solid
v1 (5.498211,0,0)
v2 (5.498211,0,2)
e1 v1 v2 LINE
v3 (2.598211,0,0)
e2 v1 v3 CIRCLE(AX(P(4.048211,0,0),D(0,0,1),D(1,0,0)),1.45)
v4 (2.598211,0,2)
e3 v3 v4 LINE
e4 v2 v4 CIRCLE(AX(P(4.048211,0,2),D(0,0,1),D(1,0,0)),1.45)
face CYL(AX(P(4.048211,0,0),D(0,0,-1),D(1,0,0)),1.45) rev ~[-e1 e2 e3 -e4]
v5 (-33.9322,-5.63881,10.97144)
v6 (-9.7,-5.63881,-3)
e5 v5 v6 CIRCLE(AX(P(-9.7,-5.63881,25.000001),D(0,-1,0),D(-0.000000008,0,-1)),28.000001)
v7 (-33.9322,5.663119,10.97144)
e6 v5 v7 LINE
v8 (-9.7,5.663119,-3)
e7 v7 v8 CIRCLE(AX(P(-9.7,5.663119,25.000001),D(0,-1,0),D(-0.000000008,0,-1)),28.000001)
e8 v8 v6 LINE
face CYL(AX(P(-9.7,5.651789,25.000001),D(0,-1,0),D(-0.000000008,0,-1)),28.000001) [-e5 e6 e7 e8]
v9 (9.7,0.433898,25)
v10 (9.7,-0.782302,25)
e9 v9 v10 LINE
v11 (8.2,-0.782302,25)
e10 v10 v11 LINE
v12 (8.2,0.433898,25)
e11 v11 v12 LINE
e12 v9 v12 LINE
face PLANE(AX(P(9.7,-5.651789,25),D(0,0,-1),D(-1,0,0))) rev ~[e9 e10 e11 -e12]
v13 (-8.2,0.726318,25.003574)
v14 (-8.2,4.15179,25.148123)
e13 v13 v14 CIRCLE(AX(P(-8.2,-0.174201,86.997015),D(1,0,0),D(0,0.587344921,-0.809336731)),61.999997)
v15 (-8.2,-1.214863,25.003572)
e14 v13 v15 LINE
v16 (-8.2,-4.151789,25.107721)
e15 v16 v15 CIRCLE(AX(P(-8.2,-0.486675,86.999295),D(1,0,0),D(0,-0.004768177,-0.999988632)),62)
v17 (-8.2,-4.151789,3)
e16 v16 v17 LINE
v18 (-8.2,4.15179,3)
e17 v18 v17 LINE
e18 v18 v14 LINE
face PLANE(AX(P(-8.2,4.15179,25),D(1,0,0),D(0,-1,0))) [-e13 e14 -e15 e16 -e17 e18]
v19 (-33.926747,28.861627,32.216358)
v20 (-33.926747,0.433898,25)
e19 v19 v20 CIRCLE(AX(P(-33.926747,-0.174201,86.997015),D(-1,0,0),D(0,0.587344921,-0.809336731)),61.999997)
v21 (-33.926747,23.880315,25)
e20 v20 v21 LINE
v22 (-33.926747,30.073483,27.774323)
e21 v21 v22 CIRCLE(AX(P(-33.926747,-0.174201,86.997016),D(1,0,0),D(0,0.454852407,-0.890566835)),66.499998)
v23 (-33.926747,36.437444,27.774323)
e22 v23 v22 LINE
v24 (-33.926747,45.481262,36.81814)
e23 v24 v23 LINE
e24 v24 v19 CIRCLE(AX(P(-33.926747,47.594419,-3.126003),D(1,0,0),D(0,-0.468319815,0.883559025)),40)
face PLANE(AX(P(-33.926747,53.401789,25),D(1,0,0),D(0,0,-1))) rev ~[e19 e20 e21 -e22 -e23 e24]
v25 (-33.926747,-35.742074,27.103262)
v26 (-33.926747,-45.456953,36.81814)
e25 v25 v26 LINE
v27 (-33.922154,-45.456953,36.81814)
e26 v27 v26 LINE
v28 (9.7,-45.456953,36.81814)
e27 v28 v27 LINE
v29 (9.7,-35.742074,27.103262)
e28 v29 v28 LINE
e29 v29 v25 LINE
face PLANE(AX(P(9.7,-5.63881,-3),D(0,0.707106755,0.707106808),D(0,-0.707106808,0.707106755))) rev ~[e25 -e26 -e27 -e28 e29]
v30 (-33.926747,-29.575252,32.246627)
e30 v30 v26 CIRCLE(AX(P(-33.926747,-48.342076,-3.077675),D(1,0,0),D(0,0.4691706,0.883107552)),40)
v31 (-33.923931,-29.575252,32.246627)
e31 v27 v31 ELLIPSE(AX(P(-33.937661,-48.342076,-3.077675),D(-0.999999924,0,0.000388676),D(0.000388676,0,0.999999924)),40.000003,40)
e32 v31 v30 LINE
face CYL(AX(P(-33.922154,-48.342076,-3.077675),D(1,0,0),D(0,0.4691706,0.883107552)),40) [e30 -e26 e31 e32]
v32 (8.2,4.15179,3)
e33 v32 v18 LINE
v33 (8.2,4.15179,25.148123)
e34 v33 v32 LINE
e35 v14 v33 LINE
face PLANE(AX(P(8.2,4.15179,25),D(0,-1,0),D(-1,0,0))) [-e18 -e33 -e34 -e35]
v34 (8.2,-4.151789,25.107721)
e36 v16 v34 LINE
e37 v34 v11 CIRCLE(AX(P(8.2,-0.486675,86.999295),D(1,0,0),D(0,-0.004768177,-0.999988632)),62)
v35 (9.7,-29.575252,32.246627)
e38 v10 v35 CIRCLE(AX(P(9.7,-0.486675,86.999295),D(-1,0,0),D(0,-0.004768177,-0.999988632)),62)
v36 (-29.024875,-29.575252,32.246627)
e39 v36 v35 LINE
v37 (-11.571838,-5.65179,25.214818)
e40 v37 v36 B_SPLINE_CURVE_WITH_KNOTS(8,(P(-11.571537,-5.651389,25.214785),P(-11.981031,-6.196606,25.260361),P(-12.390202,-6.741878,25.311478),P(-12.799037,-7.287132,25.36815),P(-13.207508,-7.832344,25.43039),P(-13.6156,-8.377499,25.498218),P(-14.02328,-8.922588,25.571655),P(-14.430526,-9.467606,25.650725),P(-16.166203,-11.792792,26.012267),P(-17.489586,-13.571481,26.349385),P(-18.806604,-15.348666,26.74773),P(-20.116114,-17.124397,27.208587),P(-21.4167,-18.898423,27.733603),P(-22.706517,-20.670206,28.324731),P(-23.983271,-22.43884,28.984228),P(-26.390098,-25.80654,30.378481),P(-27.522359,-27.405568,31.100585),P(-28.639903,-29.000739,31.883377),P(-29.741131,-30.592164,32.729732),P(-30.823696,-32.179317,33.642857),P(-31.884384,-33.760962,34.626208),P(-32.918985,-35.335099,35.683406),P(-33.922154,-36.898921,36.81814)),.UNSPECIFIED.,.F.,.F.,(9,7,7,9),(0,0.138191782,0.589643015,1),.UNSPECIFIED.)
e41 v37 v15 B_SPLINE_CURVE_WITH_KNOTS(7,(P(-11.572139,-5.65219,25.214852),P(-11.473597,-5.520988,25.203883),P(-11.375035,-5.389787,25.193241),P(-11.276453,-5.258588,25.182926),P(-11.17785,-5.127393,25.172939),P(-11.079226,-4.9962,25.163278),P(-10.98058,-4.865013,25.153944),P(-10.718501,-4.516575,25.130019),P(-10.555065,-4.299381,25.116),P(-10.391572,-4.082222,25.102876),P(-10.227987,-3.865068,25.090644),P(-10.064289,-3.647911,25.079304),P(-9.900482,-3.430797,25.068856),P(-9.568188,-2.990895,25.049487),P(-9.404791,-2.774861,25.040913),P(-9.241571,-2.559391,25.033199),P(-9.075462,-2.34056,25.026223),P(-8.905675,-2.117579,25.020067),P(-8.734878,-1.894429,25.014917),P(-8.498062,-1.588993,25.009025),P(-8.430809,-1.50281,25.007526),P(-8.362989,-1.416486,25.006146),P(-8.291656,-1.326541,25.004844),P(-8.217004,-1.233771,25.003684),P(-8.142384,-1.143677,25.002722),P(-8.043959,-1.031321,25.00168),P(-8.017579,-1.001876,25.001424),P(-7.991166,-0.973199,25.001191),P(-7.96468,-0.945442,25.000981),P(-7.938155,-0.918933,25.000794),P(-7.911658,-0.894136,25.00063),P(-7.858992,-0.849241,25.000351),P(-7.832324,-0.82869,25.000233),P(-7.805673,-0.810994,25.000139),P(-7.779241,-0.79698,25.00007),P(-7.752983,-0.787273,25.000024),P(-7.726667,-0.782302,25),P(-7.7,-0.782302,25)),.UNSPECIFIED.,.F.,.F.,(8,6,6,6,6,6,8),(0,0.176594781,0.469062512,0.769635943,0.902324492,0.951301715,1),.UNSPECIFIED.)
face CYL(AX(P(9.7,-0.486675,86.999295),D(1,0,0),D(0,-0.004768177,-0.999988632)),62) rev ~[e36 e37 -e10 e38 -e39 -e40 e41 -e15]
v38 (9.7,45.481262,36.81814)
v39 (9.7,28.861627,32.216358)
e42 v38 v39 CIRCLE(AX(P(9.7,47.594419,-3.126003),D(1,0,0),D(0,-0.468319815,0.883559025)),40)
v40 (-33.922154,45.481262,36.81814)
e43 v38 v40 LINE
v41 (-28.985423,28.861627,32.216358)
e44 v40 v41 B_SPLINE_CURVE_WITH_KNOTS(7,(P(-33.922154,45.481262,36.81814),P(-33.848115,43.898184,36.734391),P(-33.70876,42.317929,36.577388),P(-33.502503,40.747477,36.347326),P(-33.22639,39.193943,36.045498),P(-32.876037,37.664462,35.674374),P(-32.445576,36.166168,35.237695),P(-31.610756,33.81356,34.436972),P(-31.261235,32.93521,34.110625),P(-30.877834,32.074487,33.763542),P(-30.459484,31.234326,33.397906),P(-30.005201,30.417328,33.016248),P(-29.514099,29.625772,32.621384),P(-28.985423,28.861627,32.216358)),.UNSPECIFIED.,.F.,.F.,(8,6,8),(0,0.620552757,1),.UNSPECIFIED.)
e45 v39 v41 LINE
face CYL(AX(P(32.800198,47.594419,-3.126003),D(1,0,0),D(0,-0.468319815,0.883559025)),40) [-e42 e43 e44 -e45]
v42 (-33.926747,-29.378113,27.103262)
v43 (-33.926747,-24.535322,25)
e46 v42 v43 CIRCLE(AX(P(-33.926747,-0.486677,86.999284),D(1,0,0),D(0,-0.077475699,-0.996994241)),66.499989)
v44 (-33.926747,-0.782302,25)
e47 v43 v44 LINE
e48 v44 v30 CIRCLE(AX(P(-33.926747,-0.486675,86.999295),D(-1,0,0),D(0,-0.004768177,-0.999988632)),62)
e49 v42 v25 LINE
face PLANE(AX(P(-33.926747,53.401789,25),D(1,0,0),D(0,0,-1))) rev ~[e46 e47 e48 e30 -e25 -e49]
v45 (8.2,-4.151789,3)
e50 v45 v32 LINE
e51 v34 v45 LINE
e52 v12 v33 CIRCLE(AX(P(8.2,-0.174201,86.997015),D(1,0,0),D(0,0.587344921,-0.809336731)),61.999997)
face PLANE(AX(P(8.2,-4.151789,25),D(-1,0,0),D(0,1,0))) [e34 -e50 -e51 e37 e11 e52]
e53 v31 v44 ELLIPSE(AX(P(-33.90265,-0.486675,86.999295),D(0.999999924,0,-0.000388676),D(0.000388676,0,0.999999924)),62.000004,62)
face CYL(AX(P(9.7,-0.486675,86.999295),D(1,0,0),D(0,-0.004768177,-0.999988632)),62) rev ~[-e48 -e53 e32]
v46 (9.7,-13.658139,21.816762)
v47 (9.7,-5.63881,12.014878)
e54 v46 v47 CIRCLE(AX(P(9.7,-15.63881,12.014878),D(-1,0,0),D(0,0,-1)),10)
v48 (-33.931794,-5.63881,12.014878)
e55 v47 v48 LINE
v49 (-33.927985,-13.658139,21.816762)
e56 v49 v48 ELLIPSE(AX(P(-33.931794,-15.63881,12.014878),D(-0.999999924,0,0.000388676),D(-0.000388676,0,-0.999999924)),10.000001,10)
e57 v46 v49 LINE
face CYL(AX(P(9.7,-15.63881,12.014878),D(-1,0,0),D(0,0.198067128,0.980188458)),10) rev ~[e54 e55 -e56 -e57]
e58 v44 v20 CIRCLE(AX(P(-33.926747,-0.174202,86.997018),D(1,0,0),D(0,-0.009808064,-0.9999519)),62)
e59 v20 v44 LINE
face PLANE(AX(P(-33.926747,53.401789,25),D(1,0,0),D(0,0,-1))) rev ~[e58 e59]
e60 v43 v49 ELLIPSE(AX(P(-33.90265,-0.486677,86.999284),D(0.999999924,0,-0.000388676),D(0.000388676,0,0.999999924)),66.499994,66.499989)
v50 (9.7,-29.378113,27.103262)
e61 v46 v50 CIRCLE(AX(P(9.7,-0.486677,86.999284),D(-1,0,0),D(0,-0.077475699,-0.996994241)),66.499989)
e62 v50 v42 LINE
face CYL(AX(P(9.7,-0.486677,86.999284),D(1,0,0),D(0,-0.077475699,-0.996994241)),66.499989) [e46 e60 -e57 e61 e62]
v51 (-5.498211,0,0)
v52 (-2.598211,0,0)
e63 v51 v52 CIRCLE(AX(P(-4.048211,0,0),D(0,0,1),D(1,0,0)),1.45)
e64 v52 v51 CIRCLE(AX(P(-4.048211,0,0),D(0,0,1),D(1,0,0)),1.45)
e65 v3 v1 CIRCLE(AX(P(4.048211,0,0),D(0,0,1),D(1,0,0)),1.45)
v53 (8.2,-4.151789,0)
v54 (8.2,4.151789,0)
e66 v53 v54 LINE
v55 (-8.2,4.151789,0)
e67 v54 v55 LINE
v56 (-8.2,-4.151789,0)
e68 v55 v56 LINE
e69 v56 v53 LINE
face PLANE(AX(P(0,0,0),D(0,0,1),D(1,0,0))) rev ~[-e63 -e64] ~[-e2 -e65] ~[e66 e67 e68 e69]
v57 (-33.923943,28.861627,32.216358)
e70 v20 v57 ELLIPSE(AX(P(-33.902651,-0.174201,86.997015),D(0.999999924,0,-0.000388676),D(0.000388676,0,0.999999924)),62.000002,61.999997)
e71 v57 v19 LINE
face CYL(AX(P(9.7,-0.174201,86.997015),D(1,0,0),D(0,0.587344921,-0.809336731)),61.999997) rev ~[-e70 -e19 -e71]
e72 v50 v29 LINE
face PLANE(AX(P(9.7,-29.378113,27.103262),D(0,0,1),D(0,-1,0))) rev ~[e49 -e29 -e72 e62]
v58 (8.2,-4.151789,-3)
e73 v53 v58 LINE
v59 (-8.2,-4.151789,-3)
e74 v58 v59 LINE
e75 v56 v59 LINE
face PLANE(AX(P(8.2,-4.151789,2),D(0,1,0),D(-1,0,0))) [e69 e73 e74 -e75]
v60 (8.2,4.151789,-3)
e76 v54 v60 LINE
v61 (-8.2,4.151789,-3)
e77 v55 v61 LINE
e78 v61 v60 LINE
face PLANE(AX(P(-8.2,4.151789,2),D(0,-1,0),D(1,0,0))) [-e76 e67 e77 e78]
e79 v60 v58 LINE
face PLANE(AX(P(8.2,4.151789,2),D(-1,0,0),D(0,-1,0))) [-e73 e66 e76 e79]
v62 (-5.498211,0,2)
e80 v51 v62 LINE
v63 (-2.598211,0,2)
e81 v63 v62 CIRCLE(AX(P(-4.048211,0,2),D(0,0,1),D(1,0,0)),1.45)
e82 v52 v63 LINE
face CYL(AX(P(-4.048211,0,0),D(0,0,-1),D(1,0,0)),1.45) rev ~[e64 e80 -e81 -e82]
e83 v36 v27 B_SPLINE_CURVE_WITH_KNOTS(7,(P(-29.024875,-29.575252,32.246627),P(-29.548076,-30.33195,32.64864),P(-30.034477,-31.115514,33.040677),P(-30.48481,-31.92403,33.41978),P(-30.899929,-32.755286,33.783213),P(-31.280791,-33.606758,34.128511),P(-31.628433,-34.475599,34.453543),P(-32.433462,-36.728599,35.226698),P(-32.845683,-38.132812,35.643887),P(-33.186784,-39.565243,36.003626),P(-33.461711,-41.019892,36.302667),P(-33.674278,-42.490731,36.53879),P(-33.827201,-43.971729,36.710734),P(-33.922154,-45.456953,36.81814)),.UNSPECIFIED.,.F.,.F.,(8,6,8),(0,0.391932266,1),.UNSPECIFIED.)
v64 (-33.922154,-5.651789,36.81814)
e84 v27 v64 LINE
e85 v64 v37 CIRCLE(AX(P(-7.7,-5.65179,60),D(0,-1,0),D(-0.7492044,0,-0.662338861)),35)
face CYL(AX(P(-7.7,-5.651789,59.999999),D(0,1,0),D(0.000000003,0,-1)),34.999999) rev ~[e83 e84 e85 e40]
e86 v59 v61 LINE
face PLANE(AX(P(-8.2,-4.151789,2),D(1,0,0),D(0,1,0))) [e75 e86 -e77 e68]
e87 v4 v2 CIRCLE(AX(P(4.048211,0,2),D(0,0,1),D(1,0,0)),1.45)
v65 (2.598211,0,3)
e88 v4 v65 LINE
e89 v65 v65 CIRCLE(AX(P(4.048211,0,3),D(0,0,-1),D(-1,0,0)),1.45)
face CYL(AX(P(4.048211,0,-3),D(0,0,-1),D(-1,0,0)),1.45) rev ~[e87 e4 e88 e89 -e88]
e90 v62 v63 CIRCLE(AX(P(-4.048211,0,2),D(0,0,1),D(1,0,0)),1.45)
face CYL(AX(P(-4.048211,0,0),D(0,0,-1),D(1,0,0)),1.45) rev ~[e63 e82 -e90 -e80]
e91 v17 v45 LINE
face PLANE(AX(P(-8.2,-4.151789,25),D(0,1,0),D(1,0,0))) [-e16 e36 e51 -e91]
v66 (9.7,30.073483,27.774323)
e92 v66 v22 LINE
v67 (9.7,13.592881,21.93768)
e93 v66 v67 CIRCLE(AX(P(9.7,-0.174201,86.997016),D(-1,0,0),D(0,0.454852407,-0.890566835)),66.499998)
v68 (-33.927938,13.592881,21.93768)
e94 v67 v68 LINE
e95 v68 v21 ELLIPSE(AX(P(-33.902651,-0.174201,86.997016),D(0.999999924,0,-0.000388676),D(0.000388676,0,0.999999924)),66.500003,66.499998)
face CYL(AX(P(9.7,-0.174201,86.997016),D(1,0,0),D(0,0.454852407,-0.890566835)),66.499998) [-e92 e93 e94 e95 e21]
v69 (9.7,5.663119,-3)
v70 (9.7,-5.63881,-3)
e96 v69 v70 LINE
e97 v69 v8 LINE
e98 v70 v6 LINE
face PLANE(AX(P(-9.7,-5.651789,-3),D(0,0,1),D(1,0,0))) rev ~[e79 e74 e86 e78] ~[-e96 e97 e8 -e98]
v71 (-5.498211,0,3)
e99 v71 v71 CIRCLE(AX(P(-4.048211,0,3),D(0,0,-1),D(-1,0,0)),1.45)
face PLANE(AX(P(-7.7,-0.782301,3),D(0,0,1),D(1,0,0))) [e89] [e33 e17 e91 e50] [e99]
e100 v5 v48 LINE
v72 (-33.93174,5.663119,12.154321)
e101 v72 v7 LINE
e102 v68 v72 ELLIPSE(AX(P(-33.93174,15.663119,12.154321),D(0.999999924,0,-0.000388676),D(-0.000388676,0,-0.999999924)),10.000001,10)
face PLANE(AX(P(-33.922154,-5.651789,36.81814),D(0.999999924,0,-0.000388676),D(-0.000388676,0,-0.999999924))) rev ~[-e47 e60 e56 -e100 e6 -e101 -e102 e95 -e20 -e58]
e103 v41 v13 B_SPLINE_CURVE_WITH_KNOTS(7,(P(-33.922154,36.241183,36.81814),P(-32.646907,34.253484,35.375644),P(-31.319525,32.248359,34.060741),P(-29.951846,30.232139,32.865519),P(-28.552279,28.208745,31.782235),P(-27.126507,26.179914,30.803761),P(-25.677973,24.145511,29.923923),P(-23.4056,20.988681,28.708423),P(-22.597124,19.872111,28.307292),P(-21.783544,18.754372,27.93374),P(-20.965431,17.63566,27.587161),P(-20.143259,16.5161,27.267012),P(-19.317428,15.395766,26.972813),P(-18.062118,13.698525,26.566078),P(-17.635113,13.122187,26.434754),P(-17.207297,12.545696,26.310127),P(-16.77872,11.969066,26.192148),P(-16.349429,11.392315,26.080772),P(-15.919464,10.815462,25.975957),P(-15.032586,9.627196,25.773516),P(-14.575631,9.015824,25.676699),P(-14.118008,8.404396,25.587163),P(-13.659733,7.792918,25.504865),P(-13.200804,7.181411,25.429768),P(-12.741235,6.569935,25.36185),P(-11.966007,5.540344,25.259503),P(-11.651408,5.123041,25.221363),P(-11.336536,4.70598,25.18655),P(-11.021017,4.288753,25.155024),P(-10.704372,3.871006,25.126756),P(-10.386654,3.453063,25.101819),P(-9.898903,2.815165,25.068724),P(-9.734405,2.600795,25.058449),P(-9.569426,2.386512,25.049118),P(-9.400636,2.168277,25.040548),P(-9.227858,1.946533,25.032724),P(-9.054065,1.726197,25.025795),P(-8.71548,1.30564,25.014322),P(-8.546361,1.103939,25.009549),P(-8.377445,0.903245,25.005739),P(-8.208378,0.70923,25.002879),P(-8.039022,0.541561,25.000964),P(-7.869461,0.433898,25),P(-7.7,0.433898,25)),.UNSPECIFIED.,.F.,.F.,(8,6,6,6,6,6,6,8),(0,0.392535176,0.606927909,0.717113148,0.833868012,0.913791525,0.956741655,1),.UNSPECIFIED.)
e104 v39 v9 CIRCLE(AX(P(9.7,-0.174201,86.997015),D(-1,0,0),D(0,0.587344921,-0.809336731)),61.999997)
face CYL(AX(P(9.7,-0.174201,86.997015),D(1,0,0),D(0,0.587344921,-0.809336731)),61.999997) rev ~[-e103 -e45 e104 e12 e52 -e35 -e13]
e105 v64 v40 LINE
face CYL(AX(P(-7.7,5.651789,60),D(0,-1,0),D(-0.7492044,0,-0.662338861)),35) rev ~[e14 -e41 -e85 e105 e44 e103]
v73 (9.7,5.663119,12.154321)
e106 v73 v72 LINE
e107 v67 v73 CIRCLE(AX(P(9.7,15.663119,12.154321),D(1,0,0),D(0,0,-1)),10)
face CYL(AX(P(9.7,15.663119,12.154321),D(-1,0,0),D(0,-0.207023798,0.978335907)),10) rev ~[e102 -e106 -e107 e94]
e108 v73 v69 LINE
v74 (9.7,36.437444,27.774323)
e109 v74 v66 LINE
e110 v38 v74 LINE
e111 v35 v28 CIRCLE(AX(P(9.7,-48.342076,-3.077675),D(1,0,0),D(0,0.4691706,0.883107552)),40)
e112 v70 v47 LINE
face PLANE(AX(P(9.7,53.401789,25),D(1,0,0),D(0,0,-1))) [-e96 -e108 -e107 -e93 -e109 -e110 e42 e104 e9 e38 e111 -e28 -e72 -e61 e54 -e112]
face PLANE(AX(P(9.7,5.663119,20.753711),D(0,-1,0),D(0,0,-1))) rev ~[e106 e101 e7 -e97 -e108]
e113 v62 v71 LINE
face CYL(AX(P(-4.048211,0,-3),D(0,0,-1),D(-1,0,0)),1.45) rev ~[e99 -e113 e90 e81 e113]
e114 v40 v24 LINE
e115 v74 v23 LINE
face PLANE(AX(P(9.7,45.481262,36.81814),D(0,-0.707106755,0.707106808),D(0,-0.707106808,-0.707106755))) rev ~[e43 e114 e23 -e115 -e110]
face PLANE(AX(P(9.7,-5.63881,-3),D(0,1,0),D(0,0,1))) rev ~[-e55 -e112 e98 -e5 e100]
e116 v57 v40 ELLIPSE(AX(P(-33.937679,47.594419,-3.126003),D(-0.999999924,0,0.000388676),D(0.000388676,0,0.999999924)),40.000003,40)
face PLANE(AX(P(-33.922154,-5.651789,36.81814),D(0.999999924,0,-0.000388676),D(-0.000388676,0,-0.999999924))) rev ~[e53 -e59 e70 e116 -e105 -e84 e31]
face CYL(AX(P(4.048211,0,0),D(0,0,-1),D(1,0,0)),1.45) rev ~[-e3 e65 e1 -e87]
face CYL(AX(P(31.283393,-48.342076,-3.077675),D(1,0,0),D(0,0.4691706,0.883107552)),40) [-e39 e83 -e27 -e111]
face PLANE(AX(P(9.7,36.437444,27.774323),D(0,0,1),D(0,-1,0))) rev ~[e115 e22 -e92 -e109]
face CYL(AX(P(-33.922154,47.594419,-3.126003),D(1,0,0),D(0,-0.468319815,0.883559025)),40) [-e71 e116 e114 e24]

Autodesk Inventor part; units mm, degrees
ref_plane "YZ Plane" through (0, 0, 0) normal (1, 0, 0) x (0, 1, 0)
ref_plane "XZ Plane" through (0, 0, 0) normal (0, 1, 0) x (-1, 0, 0)
sketch "Sketch1" plane through (0, 0, 0) normal (0, 0, 1) x (1, 0, 0)
  circle A0 centre (-4.048211, 0) radius 1.45
  circle A1 centre (4.048211, 0) radius 1.45
  line L0 (-8, 3.951789) -> (-8, -3.951789)
  line L1 (-8, -3.951789) -> (8, -3.951789)
  line L2 (8, -3.951789) -> (8, 3.951789)
  line L3 (8, 3.951789) -> (-8, 3.951789)
  line L4 (8.2, 4.151789) -> (8.2, -4.151789)
  line L5 (8.2, -4.151789) -> (-8.2, -4.151789)
  line L6 (-8.2, -4.151789) -> (-8.2, 4.151789)
  line L7 (-8.2, 4.151789) -> (8.2, 4.151789)
  point P0 (0, 0)
  dimension "d0" = 0.2
sketch "Sketch1 outline for Extrusion1" plane through (0, 0, 0) normal (0, 0, 1) x (1, 0, 0)
  line L0 (8.2, 4.151789) -> (-8.2, 4.151789)
  line L1 (8.2, -4.151789) -> (8.2, 4.151789)
  line L2 (-8.2, 4.151789) -> (-8.2, -4.151789)
  line L3 (-8.2, -4.151789) -> (8.2, -4.151789)
  circle A0 centre (4.048211, 0) radius 1.45
  circle A1 centre (-4.048211, 0) radius 1.45
extrude "Extrusion1" add sketch "Sketch1 outline for Extrusion1" along normal blind 2
sketch "Sketch2" plane through (0, 0, 2) normal (0, 0, 1) x (1, 0, 0)
  line L0 (8.2, -4.151789) -> (8.2, 4.151789)
  line L1 (8.2, 4.151789) -> (-8.2, 4.151789)
  line L2 (-8.2, 4.151789) -> (-8.2, -4.151789)
  line L3 (-8.2, -4.151789) -> (8.2, -4.151789)
  line L4 (9.7, 5.651789) -> (9.7, -5.651789)
  line L5 (9.7, -5.651789) -> (-9.7, -5.651789)
  line L6 (-9.7, -5.651789) -> (-9.7, 5.651789)
  line L7 (-9.7, 5.651789) -> (9.7, 5.651789)
  point P0 (0, 0)
  dimension "d3" = 1.5
ref_plane "Work Plane1" through (7.997687, -5.958328, -3) normal (0, 0, 1) x (1, 0, 0)
sketch "Sketch2 outline for Extrusion2" plane through (0, 0, 2) normal (0, 0, 1) x (1, 0, 0)
  line L0 (9.7, 5.651789) -> (-9.7, 5.651789)
  line L1 (9.7, -5.651789) -> (9.7, 5.651789)
  line L2 (-9.7, 5.651789) -> (-9.7, -5.651789)
  line L3 (-9.7, -5.651789) -> (9.7, -5.651789)
  line L4 (8.2, -4.151789) -> (-8.2, -4.151789)
  line L5 (8.2, 4.151789) -> (8.2, -4.151789)
  line L6 (-8.2, 4.151789) -> (8.2, 4.151789)
  line L7 (-8.2, -4.151789) -> (-8.2, 4.151789)
extrude "Extrusion2" add sketch "Sketch2 outline for Extrusion2" against normal up to surface (5 mm away)
sketch "Sketch3" plane through (-9.7, 5.651789, 2) normal (0, 1, 0) x (1, 0, 0)
  line L0 (0, 0) -> (0, 5)
  line L1 (0, 0) -> (0, -23)
  line L2 (0, -23) -> (-19.79899, -3.20101)
  line L3 (0, -23) -> (28, -23) construction
  arc A0 (-33.20486, -51.037646) -> (-33.20486, -51.037646) centre (1.795137, -51.024043) ccw
  arc A1 (-33.20486, -51.037646) -> (-33.20486, -51.037646) centre (1.795137, -51.024043) ccw
  line L4 (0, -23) -> (0, -58)
  line L5 (0, -58) -> (2, -58)
  arc A2 (-26.992777, -30.442444) -> (-24.224883, -27.796432) centre (2, -58) ccw
  line L6 (-24.218855, -43.305973) -> (-24.238811, 8.039757)
  line L7 (19.4, 0) -> (19.4, 5)
  line L8 (19.4, 5) -> (19.4, -23)
  line L9 (2, -23) -> (19.4, -23)
  line L10 (0, 0) -> (19.4, 0)
  arc A3 (-24.221288, -37.047392) -> (28, -23) centre (0, -23) ccw
  arc A4 (0, -46) -> (23, -23) centre (0, -23) ccw
  arc A5 (-26.992777, -30.442444) -> (-24.962512, -35.683572) centre (0, -23) ccw
  arc A6 (2, -23) -> (-24.222154, -34.81814) centre (2, -58) ccw
  arc A7 (-24.962512, -35.683572) -> (22.105735, -29.351101) centre (2, -58) ccw
  arc A8 (0, 5) -> (-24.2322, -8.97144) centre (0, -23) ccw
  arc A9 (19.4, -10.645244) -> (0, 0) centre (0, -23) ccw
  point P0 (9.7, 2)
  point P1 (0, -23)
  point P2 (0, -23)
  point P3 (0, -23.05719)
  dimension "d6" = 23
  dimension "d7" = 135
  dimension "d21" = 35
  dimension "d23" = 2
sketch "Sketch3 outline for Extrusion3" plane through (-9.7, 5.651789, 2) normal (0, 1, 0) x (1, 0, 0)
  line L0 (19.4, 0) -> (0, 0)
  line L1 (0, 0) -> (0, 5)
  arc A0 (0, 5) -> (-24.2322, -8.97144) centre (0, -23) ccw
  line L2 (-24.2322, -8.97144) -> (-24.222154, -34.81814)
  arc A1 (-24.222154, -34.81814) -> (2, -23) centre (2, -58) cw
  line L3 (2, -23) -> (19.4, -23)
  line L4 (19.4, -23) -> (19.4, 0)
extrude "Extrusion3" add sketch "Sketch3 outline for Extrusion3" against normal up to surface (11.303579 mm away)
sketch "Sketch18" plane through (-7.7, 5.651789, 25) normal (0, 1, 0) x (1, 0, 0)
  line L0 (-2, 28) -> (17.4, 28)
  arc A0 (-2, 28) -> (-26.2322, 14.02856) centre (-2, 0) ccw
  line L1 (-26.2322, 14.02856) -> (-26.222154, -11.81814)
  arc A1 (0, 0) -> (-26.222154, -11.81814) centre (0, -35) ccw
  line L2 (0, 0) -> (17.4, 0)
  line L3 (17.4, 0) -> (17.4, 28)
  point P0 (7.7, 25)
sketch "Sketch18 outline for Extrusion15" plane through (-7.7, 5.651789, 25) normal (0, 1, 0) x (1, 0, 0)
  line L0 (-26.2322, 14.02856) -> (-26.222154, -11.81814)
  arc A0 (-2, 28) -> (-26.2322, 14.02856) centre (-2, 0) ccw
  line L1 (17.4, 28) -> (-2, 28)
  line L2 (17.4, 0) -> (17.4, 28)
  line L3 (0, 0) -> (17.4, 0)
  arc A1 (-26.222154, -11.81814) -> (0, 0) centre (0, -35) cw
extrude "Extrusion15" add sketch "Sketch18 outline for Extrusion15" along normal blind 47.75
sketch "Sketch19" plane through (-9.7, -5.651789, -3) normal (0, -1, 0) x (1, 0, 0)
  line L0 (19.4, 0) -> (0, 0)
  line L1 (19.4, 28) -> (19.4, 0)
  line L2 (2, 28) -> (19.4, 28)
  arc A0 (-24.222154, 39.81814) -> (2, 28) centre (2, 63) ccw
  line L3 (-24.2322, 13.97144) -> (-24.222154, 39.81814)
  arc A1 (-24.2322, 13.97144) -> (0, 0) centre (0, 28) ccw
  point P0 (9.7, 3)
sketch "Sketch19 outline for Extrusion16" plane through (-9.7, -5.651789, -3) normal (0, -1, 0) x (1, 0, 0)
  arc A0 (-24.2322, 13.97144) -> (0, 0) centre (0, 28) ccw
  line L0 (-24.222154, 39.81814) -> (-24.2322, 13.97144)
  arc A1 (2, 28) -> (-24.222154, 39.81814) centre (2, 63) cw
  line L1 (19.4, 28) -> (2, 28)
  line L2 (19.4, 0) -> (19.4, 28)
  line L3 (0, 0) -> (19.4, 0)
extrude "Extrusion16" add sketch "Sketch19 outline for Extrusion16" along normal blind 47.75
sketch "Sketch20" plane through (9.7, 53.401789, 25) normal (1, 0, 0) x (0, 0, -1)
  circle A0 centre (-28.024043, -53.730658) radius 35
  line L0 (0, 0) -> (0, -106.803579)
  line L1 (-28.024043, -53.730658) -> (0, -54.184091)
  line L2 (0, -54.184091) -> (6.97302, -54.184091)
  line L3 (0, -54.184091) -> (6.97302, -54.184091) construction
  line L4 (0, -106.803579) -> (0, 0)
  line L5 (-11.81814, 0) -> (0, 0)
  line L6 (-11.81814, -106.803579) -> (-11.81814, 0)
  line L7 (0, -106.803579) -> (-11.81814, -106.803579)
  circle A1 centre (-28.024043, -53.730658) radius 40
  arc A2 (0, -54.184091) -> (-11.81814, -17.160606) centre (-61.997018, -53.575991) ccw
  arc A3 (-11.81814, -90.30071) -> (0, -54.184091) centre (-61.999295, -53.888464) ccw
  point P0 (25, -53.401789)
  point P1 (0, -52.967891)
  dimension "d55" = 0
  dimension "d56" = 6.97302
  dimension "d57" = 5
  dimension "d58" = 62
  dimension "d59" = 62
sketch "Sketch20 outline for Extrusion17" plane through (9.7, 53.401789, 25) normal (1, 0, 0) x (0, 0, -1)
  arc A0 (0, -54.184091) -> (-11.81814, -90.30071) centre (-61.999295, -53.888464) cw
  line L0 (0, -106.803579) -> (0, -54.184091)
  line L1 (-11.81814, -106.803579) -> (0, -106.803579)
  line L2 (-11.81814, -90.30071) -> (-11.81814, -106.803579)
  arc A1 (-11.81814, -17.160606) -> (0, -52.967891) centre (-61.997018, -53.575991) cw
  line L3 (-11.81814, 0) -> (-11.81814, -17.160606)
  line L4 (0, 0) -> (-11.81814, 0)
  line L5 (0, -52.967891) -> (0, 0)
  arc A2 (0, -54.184091) -> (0, -52.967891) centre (-61.997018, -53.575991) ccw
  line L6 (0, -52.967891) -> (0, -54.184091)
extrude "Extrusion17" add sketch "Sketch20 outline for Extrusion17" against normal up to surface (43.626747 mm away)
sketch "Sketch21" plane through (9.7, -53.401789, -3) normal (1, 0, 0) x (0, 0, -1)
  line L0 (-48.305973, 110.199312) -> (3.039757, 58.853579)
  line L1 (3.015448, 47.95) -> (-48.305973, -3.371424)
  line L2 (-49.720186, 108.785098) -> (1.625543, 57.439365)
  line L3 (1.601234, 49.364214) -> (-49.720186, -1.957211)
  line L4 (0, 0) -> (-39.81814, 0)
  line L5 (0, 106.803579) -> (0, 0)
  line L6 (0, 106.803579) -> (-39.81814, 106.803579)
  line L7 (-39.81814, 106.803579) -> (-39.81814, 89.642972)
  arc A0 (-28, 53.835688) -> (-39.81814, 89.642972) centre (-89.997018, 53.227588) ccw
  line L8 (-28, 53.835688) -> (-28, 52.619488)
  arc A1 (-39.81814, 16.502868) -> (-28, 52.619488) centre (-89.999295, 52.915114) ccw
  line L9 (-39.81814, 16.502868) -> (-39.81814, 0)
  point P0 (-3, 53.401789)
  point P1 (0, 47.762979)
  point P2 (-39.81814, 7.944836)
  point P3 (-39.81814, 98.883051)
  point P4 (0, 59.064908)
  dimension "d62" = 2
  dimension "d63" = 2
sketch "Sketch21 outline for Extrusion18" plane through (9.7, -53.401789, -3) normal (1, 0, 0) x (0, 0, -1)
  line L0 (-39.81814, 0) -> (0, 0)
  line L1 (-39.81814, 7.944836) -> (-39.81814, 0)
  line L2 (0, 47.762979) -> (-39.81814, 7.944836)
  line L3 (0, 0) -> (0, 47.762979)
  line L4 (0, 106.803579) -> (-39.81814, 106.803579)
  line L5 (0, 59.064908) -> (0, 106.803579)
  line L6 (-39.81814, 98.883051) -> (0, 59.064908)
  line L7 (-39.81814, 106.803579) -> (-39.81814, 98.883051)
extrude "Extrusion18" cut sketch "Sketch21 outline for Extrusion18" against normal through all
fillet "Fillet2" radius 40 2 edges at (-12.1111, -36.8989, 36.8181) (-12.1111, 36.2412, 36.8181)
sketch "Sketch22" plane through (9.7, -5.63881, -3) normal (1, 0, 0) x (0, 0, -1)
  line L0 (0, -0.312979) -> (0, 11.590599)
  line L1 (-39.81814, -39.818143) -> (0, 0)
  line L2 (0, 11.301929) -> (-39.81814, 51.120072)
  arc A0 (-28, 6.072708) -> (-35.216358, 34.500437) centre (-89.997018, 5.464608) ccw
  arc A1 (-35.246627, -23.936442) -> (-28, 4.856508) centre (-89.999295, 5.152135) ccw
  line L3 (-28, 6.072708) -> (-28, 4.856508)
  arc A2 (-35.246627, -23.936442) -> (-39.81814, -39.818143) centre (0.077675, -42.703266) ccw
  arc A3 (-39.81814, 51.120072) -> (-35.216358, 34.500437) centre (0.126003, 53.233229) ccw
  line L4 (-3.181981, 8.119949) -> (-30.774323, 35.712293)
  arc A4 (-23.5, 6.094391) -> (-30.774323, 35.712293) centre (-89.997018, 5.464608) ccw
  line L5 (-23.5, 6.094391) -> (-23.5, 4.845968)
  arc A5 (-30.103262, -23.739303) -> (-23.5, 4.845968) centre (-89.999295, 5.152135) ccw
  line L6 (-30.103262, -23.739303) -> (-3.181981, 3.18198)
  line L7 (-3, 9.590599) -> (-3, 1.687021)
  line L8 (-6, 9.590599) -> (-6, 1.687021)
  line L9 (0, 11.301929) -> (8.286805, 11.301929) construction
  line L10 (0, 11.301929) -> (-23.784266, 11.301929)
  line L11 (0, 11.301929) -> (23.784266, 11.301929) construction
  line L12 (0, 0) -> (-23.699178, 0)
  line L13 (0, 0) -> (23.699178, 0) construction
  line L14 (-30.103262, -23.739303) -> (-30.103262, -30.103264)
  line L15 (-30.774323, 35.712293) -> (-30.774323, 42.076254)
  point P0 (-3, 5.63881)
  point P1 (-23.699178, 0)
  point P2 (-23.753711, 11.301929)
  dimension "d67" = 4.5
  dimension "d68" = 3
  dimension "d70" = 180
  dimension "d71" = 180
sketch "Sketch22 outline for Extrusion19" plane through (9.7, -5.63881, -3) normal (1, 0, 0) x (0, 0, -1)
  line L0 (0, 0) -> (-23.699178, 0)
  line L1 (-30.103262, -30.103264) -> (0, 0)
  line L2 (-30.103262, -23.739303) -> (-30.103262, -30.103264)
  arc A0 (-23.699178, 0) -> (-30.103262, -23.739303) centre (-89.999295, 5.152135) cw
  line L3 (-23.753711, 11.301929) -> (0, 11.301929)
  arc A1 (-30.774323, 35.712293) -> (-23.753711, 11.301929) centre (-89.997018, 5.464608) cw
  line L4 (-30.774323, 42.076254) -> (-30.774323, 35.712293)
  line L5 (0, 11.301929) -> (-30.774323, 42.076254)
extrude "Extrusion19" cut sketch "Sketch22 outline for Extrusion19" against normal through all
sketch "Sketch23" plane through (-7.7, -0.782301, 25) normal (0, 0, 1) x (1, 0, 0)
  line L0 (17.4, -4.856508) -> (-2, -4.856508)
  line L1 (-2, -4.856508) -> (-2, 6.44542)
  line L2 (-2, 6.44542) -> (17.4, 6.44542)
  line L3 (17.4, 6.44542) -> (17.4, -4.856508)
  line L4 (-0.5, 4.934091) -> (-0.5, -3.369488)
  line L5 (-0.5, -3.369488) -> (15.9, -3.369488)
  line L6 (15.9, -3.369488) -> (15.9, 4.934091)
  line L7 (15.9, 4.934091) -> (-0.5, 4.934091)
  point P0 (7.7, 0.782301)
sketch "Sketch23 outline for Extrusion20" plane through (-7.7, -0.782301, 25) normal (0, 0, 1) x (1, 0, 0)
  line L0 (-0.5, 4.934091) -> (-0.5, -3.369488)
  line L1 (15.9, 4.934091) -> (-0.5, 4.934091)
  line L2 (15.9, -3.369488) -> (15.9, 4.934091)
  line L3 (-0.5, -3.369488) -> (15.9, -3.369488)
extrude "Extrusion20" cut sketch "Sketch23 outline for Extrusion20" against normal blind 22
sketch "Sketch26" plane through (9.7, -0.782301, 25) normal (0, 0, 1) x (1, 0, 0)
  line L0 (0, -4.856508) -> (-19.4, -4.856508)
  line L1 (-19.4, -4.856508) -> (-19.4, 6.44542)
  line L2 (-19.4, 6.44542) -> (0, 6.44542)
  line L3 (0, 6.44542) -> (0, -4.856508)
  line L4 (-17.9, 4.934091) -> (-17.9, -3.369488)
  line L5 (-17.9, -3.369488) -> (-1.5, -3.369488)
  line L6 (-1.5, -3.369488) -> (-1.5, 4.934091)
  line L7 (-1.5, 4.934091) -> (-17.9, 4.934091)
  point P0 (-9.7, 0.782301)
sketch "Sketch26 outline for Extrusion21" plane through (9.7, -0.782301, 25) normal (0, 0, 1) x (1, 0, 0)
  line L0 (-17.9, 4.934091) -> (-17.9, -3.369488)
  line L1 (-1.5, 4.934091) -> (-17.9, 4.934091)
  line L2 (-1.5, -3.369488) -> (-1.5, 4.934091)
  line L3 (-17.9, -3.369488) -> (-1.5, -3.369488)
extrude "Extrusion21" cut sketch "Sketch26 outline for Extrusion21" along normal blind 22
sketch "Sketch27" plane through (9.7, -5.63881, -3) normal (0, 0, -1) x (-1, 0, 0)
  circle A0 centre (5.651789, 5.63881) radius 1.45
  circle A1 centre (13.748211, 5.63881) radius 1.45
  point P0 (9.7, 5.63881)
sketch "Sketch27 outline for Extrusion22" plane through (9.7, -5.63881, -3) normal (0, 0, -1) x (-1, 0, 0)
  circle A0 centre (5.651789, 5.63881) radius 1.45
  circle A1 centre (13.748211, 5.63881) radius 1.45
extrude "Extrusion22" cut sketch "Sketch27 outline for Extrusion22" against normal blind 22
fillet "Fillet3" radius 10 2 edges at (-12.1142, 5.6631, 20.7537) (-12.1142, -5.6388, 20.6992)
properties part number "KickerFoot_3DPrint"
